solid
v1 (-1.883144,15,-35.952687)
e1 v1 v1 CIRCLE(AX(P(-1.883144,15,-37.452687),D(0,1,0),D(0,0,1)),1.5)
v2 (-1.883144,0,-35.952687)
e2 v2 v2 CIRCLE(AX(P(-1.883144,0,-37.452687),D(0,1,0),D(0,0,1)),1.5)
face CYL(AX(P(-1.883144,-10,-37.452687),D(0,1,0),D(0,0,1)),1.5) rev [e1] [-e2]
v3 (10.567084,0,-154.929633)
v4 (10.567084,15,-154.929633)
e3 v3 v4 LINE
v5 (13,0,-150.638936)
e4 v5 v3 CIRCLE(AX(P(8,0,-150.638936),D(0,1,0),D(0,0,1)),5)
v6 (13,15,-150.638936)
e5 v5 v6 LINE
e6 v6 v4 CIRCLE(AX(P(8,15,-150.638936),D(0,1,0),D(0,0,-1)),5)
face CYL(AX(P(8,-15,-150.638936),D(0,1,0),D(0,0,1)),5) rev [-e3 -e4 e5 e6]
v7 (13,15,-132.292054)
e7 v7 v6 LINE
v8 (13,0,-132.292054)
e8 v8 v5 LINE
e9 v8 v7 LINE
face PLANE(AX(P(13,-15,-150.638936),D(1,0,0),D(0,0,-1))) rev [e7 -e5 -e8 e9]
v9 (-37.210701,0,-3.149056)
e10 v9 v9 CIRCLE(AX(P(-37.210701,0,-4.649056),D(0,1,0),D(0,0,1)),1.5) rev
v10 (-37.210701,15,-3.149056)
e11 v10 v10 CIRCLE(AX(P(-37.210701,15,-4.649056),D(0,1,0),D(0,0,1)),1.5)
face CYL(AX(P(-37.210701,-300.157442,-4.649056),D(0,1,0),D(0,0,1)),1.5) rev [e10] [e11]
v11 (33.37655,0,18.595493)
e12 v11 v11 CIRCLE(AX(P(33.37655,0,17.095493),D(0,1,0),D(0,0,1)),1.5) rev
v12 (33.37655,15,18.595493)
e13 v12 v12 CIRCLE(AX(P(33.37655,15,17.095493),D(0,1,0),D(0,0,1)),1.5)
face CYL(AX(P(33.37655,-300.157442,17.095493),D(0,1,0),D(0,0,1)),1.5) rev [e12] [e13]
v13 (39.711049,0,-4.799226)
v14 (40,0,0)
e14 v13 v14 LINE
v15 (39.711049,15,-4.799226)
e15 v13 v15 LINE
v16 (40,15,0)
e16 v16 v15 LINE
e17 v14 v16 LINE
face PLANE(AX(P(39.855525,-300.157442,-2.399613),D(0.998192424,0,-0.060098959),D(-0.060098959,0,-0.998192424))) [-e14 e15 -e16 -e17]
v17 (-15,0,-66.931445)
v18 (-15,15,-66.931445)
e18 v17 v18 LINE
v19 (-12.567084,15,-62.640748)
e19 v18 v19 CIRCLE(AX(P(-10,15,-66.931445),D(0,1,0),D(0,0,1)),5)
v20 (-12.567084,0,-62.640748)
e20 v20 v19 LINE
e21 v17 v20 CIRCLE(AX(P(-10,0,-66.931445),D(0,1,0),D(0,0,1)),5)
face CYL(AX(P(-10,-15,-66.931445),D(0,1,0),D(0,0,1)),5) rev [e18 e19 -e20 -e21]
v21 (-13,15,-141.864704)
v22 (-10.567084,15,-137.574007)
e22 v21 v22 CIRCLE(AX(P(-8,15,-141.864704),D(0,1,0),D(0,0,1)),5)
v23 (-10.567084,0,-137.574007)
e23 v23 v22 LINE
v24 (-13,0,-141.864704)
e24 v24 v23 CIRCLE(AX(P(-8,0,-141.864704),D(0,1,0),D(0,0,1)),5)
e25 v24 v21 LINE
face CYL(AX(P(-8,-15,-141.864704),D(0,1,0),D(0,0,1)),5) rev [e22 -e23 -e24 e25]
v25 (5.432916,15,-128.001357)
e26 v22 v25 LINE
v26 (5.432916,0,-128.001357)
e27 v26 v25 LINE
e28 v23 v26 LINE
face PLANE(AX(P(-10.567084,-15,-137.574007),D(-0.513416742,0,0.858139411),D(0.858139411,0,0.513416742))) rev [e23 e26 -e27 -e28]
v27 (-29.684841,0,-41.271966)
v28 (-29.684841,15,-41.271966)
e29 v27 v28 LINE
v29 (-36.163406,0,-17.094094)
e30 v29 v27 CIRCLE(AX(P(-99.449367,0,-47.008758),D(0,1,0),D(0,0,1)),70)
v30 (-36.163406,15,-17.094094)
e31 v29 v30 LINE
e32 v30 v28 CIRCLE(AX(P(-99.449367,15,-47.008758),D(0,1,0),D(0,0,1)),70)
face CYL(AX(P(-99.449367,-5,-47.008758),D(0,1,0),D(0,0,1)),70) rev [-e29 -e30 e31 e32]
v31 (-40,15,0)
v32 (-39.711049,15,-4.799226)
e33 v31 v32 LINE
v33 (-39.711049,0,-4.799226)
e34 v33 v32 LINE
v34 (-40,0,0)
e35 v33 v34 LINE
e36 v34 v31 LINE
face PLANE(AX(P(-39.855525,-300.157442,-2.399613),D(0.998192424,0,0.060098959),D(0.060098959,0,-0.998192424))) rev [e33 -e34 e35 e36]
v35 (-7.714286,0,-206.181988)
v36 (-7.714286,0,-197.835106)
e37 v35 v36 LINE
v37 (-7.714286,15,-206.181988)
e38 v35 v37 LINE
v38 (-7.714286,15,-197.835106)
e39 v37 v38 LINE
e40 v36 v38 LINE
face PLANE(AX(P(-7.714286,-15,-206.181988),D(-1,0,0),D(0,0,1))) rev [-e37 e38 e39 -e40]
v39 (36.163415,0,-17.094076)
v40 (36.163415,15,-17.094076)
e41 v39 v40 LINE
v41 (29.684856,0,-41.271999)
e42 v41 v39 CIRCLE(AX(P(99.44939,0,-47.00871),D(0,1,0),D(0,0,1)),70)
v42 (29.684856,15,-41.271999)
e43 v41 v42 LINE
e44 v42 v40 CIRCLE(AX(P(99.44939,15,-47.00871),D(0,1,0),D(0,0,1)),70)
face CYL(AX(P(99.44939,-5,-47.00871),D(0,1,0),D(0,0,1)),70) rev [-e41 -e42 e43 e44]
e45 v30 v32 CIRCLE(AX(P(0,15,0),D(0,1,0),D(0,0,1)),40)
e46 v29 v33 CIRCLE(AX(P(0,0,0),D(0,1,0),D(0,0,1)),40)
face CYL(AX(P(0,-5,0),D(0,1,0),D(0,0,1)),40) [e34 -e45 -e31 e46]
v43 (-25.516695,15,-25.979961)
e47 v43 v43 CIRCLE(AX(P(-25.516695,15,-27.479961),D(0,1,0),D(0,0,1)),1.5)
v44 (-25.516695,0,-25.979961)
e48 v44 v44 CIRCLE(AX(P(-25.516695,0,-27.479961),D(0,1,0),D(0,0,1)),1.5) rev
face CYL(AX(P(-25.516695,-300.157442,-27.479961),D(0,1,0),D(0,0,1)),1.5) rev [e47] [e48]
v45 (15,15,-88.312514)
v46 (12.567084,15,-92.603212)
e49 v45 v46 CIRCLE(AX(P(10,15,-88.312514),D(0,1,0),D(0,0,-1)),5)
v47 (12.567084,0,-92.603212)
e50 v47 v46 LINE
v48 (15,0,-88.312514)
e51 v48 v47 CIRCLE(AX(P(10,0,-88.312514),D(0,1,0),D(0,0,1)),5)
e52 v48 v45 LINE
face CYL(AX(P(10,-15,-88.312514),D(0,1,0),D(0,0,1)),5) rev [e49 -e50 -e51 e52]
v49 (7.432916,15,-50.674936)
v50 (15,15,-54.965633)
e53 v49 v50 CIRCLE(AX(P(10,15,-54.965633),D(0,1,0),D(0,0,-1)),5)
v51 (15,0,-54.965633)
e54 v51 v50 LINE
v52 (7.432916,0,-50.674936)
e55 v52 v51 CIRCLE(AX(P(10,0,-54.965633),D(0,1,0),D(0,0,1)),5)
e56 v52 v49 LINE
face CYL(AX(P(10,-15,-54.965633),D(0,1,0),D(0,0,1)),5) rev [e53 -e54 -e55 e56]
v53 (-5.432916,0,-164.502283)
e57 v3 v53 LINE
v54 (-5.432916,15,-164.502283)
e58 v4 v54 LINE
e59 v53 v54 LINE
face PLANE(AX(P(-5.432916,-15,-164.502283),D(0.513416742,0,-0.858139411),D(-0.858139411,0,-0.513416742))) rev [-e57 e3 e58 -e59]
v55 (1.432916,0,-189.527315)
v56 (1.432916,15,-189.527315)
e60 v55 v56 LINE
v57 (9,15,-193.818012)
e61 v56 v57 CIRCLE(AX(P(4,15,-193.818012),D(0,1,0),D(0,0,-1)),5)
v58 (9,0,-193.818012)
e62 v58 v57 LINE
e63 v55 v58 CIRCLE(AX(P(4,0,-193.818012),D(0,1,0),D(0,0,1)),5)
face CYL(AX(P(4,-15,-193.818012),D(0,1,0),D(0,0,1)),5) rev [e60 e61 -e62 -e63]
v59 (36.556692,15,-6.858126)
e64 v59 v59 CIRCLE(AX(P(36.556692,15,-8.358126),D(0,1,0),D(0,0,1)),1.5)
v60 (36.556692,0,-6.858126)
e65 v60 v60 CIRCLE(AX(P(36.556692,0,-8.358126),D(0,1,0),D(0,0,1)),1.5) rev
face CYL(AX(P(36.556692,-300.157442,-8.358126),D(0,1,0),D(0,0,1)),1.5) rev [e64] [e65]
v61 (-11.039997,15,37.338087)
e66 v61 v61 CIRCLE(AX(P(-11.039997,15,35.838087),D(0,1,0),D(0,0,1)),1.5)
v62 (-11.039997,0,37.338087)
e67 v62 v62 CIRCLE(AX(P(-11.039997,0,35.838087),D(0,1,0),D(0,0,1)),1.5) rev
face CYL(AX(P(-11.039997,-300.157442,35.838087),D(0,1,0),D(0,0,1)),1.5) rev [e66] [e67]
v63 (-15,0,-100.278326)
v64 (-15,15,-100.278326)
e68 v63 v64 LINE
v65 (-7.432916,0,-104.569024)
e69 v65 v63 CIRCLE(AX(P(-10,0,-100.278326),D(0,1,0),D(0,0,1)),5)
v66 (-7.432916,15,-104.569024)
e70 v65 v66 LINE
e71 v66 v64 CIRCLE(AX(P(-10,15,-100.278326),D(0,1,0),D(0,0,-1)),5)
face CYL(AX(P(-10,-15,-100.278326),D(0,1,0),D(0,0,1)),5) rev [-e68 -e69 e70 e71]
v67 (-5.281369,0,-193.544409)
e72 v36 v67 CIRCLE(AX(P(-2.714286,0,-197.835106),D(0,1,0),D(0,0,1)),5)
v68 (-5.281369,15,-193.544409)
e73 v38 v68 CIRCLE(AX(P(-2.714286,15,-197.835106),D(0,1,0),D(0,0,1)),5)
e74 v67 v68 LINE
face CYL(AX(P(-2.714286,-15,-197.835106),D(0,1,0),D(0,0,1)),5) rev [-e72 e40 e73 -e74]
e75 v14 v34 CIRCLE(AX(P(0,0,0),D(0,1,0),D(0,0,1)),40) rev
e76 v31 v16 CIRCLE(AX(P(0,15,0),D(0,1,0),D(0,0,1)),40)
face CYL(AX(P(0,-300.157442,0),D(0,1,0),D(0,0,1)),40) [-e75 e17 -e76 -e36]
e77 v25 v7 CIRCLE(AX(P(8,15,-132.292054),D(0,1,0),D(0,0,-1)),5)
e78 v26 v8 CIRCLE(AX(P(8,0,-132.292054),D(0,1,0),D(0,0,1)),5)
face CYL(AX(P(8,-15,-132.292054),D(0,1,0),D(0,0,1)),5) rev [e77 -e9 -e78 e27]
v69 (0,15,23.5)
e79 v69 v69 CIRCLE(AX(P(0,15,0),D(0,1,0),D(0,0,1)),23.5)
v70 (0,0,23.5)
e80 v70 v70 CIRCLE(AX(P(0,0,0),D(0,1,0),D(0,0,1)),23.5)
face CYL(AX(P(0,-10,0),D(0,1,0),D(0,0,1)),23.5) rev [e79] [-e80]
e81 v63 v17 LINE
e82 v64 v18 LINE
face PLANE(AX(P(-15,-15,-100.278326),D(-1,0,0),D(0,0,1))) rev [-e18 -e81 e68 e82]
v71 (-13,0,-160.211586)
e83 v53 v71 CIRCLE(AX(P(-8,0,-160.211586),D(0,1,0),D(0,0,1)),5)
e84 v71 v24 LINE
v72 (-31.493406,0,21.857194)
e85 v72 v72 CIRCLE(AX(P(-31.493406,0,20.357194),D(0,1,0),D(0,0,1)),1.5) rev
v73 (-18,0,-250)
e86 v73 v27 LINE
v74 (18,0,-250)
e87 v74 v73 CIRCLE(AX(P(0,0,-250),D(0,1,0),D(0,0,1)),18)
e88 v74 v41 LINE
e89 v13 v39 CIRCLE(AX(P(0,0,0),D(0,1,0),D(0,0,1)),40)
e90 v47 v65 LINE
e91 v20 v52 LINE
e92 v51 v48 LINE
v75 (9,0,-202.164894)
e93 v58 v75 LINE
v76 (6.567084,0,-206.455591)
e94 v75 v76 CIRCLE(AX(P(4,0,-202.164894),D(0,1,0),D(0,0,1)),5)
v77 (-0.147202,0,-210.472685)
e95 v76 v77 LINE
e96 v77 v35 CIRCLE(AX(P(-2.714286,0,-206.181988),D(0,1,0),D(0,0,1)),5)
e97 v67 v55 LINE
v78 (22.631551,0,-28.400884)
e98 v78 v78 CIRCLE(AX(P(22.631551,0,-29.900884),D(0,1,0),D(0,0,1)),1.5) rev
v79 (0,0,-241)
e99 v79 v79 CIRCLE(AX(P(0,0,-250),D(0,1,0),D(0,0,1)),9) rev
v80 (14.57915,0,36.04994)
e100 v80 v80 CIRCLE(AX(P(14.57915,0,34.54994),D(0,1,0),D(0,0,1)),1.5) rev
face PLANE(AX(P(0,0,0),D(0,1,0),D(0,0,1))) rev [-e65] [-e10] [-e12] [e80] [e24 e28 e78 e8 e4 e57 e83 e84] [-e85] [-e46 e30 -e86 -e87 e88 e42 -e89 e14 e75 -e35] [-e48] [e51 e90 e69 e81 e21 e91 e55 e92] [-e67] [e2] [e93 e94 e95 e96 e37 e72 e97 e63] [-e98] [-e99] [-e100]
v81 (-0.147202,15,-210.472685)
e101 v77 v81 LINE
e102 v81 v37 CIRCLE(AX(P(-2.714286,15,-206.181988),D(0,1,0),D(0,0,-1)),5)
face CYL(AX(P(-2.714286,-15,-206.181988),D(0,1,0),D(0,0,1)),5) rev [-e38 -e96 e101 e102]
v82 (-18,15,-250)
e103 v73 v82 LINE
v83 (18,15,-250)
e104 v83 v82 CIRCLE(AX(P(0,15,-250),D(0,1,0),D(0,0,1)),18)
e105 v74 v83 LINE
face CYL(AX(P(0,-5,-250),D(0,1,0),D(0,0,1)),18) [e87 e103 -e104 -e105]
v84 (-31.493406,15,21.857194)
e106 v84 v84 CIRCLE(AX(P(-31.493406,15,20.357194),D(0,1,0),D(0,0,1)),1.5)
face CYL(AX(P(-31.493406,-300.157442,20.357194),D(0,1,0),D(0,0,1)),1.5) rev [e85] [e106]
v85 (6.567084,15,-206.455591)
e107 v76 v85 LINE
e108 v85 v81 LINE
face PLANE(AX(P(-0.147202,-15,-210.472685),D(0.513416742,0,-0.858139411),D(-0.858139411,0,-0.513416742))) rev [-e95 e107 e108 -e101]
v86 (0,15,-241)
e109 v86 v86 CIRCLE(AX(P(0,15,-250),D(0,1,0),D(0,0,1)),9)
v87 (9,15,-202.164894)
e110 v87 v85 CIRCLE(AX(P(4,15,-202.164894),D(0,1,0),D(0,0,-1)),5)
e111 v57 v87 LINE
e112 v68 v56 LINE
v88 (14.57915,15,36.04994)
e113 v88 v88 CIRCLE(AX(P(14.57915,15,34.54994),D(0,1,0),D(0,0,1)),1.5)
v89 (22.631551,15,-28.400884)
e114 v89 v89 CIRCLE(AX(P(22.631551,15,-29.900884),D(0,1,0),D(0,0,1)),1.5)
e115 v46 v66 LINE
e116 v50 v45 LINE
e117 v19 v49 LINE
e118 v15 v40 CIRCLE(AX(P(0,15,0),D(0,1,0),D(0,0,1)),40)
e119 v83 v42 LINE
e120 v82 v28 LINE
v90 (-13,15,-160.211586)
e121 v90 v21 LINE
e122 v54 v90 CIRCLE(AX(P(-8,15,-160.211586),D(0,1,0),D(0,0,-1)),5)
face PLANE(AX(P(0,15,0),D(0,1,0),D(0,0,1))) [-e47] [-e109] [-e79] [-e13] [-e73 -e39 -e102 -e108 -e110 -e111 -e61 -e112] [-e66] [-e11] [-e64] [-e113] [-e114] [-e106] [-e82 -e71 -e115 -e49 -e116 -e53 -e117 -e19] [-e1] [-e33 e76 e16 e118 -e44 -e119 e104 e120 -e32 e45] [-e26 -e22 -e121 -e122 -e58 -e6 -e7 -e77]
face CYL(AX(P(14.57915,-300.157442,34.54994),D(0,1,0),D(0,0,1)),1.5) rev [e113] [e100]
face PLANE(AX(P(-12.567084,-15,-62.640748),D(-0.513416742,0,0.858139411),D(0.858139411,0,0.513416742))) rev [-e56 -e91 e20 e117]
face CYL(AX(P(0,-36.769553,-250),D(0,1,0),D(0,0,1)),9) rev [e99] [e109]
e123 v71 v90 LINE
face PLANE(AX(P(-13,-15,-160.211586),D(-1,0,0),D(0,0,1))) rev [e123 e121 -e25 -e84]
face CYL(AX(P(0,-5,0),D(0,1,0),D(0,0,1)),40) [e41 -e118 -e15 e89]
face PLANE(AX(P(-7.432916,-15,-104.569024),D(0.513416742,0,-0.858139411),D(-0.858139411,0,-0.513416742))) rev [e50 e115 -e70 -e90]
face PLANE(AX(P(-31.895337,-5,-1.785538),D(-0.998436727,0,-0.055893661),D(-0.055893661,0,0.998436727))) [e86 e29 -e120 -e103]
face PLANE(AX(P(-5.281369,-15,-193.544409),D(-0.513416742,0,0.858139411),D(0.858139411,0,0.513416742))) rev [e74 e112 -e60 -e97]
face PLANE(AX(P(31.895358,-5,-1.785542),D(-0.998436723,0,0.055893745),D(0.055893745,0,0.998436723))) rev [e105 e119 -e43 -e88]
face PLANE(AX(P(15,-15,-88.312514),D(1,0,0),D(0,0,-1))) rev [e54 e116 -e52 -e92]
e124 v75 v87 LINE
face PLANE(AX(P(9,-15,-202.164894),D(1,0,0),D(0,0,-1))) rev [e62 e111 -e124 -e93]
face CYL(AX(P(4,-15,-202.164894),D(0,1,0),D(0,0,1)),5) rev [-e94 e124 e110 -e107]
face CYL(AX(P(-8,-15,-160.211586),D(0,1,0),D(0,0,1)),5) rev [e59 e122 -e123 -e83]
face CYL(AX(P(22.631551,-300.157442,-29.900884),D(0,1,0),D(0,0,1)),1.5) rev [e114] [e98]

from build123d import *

# Parameters (mm, degrees)
SKETCH_1_R          = 5.05
SKETCH_1_R_2        = 13
EXTRUDE_1_DEPTH     = 15
FILLET_1_R          = 3
SKETCH_7_R          = 2.05
CUT_EXTRUDE_4_DEPTH = 277.54113618
SKETCH_8_R          = 13
CUT_EXTRUDE_5_DEPTH = 277.54113618
SKETCH_9_R          = 25
SKETCH_9_R_2        = 13
EXTRUDE_4_DEPTH     = 15
SKETCH_10_R         = 1.5
EXTRUDE_5_DEPTH     = 15
EXTRUDE_START       = -15
SKETCH_14_R         = 13
SKETCH_14_R_2       = 9
EXTRUDE_6_DEPTH     = 15
SKETCH_13_R         = 23.5
SKETCH_13_R_2       = 1.5
CUT_EXTRUDE_6_DEPTH = 25
CUT_EXTRUDE_START   = -15
CUT_EXTRUDE_7_DEPTH = 15
EXTRUDE_9_DEPTH     = 15
CUT_EXTRUDE_8_DEPTH = 30


# Read off the part's stored shape, not the designer's step: 切除-拉伸7
with BuildPart() as part:
    # 草图1 → 凸台-拉伸1 (new body)
    with BuildSketch(Plane(origin=(0, 0, 0), x_dir=(1, 0, 0), z_dir=(0, 1, 0))):
        with BuildLine():
            Line((-17.992942616, -0.504), (-24.990198078, 249.3))
            ThreePointArc((-24.990198078, 249.3), (0, 275), (24.990198078, 249.3))
            Line((24.990198078, 249.3), (17.992942616, -0.504))
            ThreePointArc((17.992942616, -0.504), (0, -18), (-17.992942616, -0.504))
        make_face()
        with Locations(Location((0, 0, 0), (0, 0, 270))):
            Circle(SKETCH_1_R, mode=Mode.SUBTRACT)
        with Locations(Location((0, 250, 0), (0, 0, 270))):
            Circle(SKETCH_1_R_2, mode=Mode.SUBTRACT)
        Polygon((-16.444447487, 158.5), (-17.704941698, 203.5), (11.028871219, 137.174942267), align=None, mode=Mode.SUBTRACT)
        Polygon((15.954255294, 141), (18.475243716, 231), (-12, 219.5), align=None, mode=Mode.SUBTRACT)
    extrude(amount=EXTRUDE_1_DEPTH)

    # 圆角1
    fillet_1_edges = [part.edges().sort_by_distance(p)[0] for p in [
        (-16.444447487, 7.5, -158.5),
        (11.028871219, 7.5, -137.174942267),
        (-17.704941698, 7.5, -203.5),
        (18.475243716, 7.5, -231),
        (-12, 7.5, -219.5),
        (15.954255294, 7.5, -141),
    ]]
    fillet(fillet_1_edges, radius=FILLET_1_R)

    # 草图7 → 切除-拉伸4 (cut, through all)
    with BuildSketch(Plane(origin=(0, 15, 0), x_dir=(1, 0, 0), z_dir=(0, 1, 0))):
        with Locations(Location((15, 15, 0), (0, 0, 270))):
            Circle(SKETCH_7_R)
        with Locations(Location((-15, 15, 0), (0, 0, 270))):
            Circle(SKETCH_7_R)
        with Locations((-15, -15)):
            Circle(SKETCH_7_R)
        with Locations((15, -15)):
            Circle(SKETCH_7_R)
    extrude(amount=-CUT_EXTRUDE_4_DEPTH, mode=Mode.SUBTRACT)

    # 草图8 → 切除-拉伸5 (cut, through all)
    with BuildSketch(Plane(origin=(0, 15, 0), x_dir=(1, 0, 0), z_dir=(0, 1, 0))):
        with Locations(Location((0, 0, 0), (0, 0, 270))):
            Circle(SKETCH_8_R)
    extrude(amount=-CUT_EXTRUDE_5_DEPTH, mode=Mode.SUBTRACT)

    # 草图9 → 凸台-拉伸4 (add)
    with BuildSketch(Plane(origin=(0, 15, 0), x_dir=(1, 0, 0), z_dir=(0, 1, 0))):
        Circle(SKETCH_9_R)
        with Locations(Location((0, 0, 0), (0, 0, 270))):
            Circle(SKETCH_9_R_2, mode=Mode.SUBTRACT)
    extrude(amount=-EXTRUDE_4_DEPTH)

    # 草图10 → 凸台-拉伸5 (add)
    with BuildSketch(Plane(origin=(0, 15, 0), x_dir=(1, 0, 0), z_dir=(0, 1, 0))):
        with BuildLine():
            Line((-39.711049207, 4.799226071), (-40, 0))
            ThreePointArc((-40, 0), (0, -40), (40, 0))
            Line((40, 0), (39.711049207, 4.799226071))
            Line((39.711049207, 4.799226071), (24.990198078, 249.3))
            Line((24.990198078, 249.3), (18.993134598, 35.203136766))
            Line((18.993134598, 35.203136766), (18.478724461, 16.838549294))
            ThreePointArc((18.478724461, 16.838549294), (0, -25), (-18.478724461, 16.838549294))
            Line((-18.478724461, 16.838549294), (-18.993134598, 35.203136766))
            Line((-18.993134598, 35.203136766), (-24.990198078, 249.3))
            Line((-24.990198078, 249.3), (-39.711049207, 4.799226071))
        make_face()
        with Locations(Location((-31.493406412, -20.357194124, 0), (0, 0, 270))):
            Circle(SKETCH_10_R, mode=Mode.SUBTRACT)
        with Locations(Location((-37.210701127, 4.649055992, 0), (0, 0, 270))):
            Circle(SKETCH_10_R, mode=Mode.SUBTRACT)
        with Locations(Location((-25.516695234, 27.479961141, 0), (0, 0, 270))):
            Circle(SKETCH_10_R, mode=Mode.SUBTRACT)
        with Locations(Location((-11.039996826, -35.838086864, 0), (0, 0, 270))):
            Circle(SKETCH_10_R, mode=Mode.SUBTRACT)
        with Locations(Location((14.579149971, -34.549940465, 0), (0, 0, 270))):
            Circle(SKETCH_10_R, mode=Mode.SUBTRACT)
        with Locations(Location((33.376550467, -17.095492942, 0), (0, 0, 270))):
            Circle(SKETCH_10_R, mode=Mode.SUBTRACT)
        with Locations(Location((22.631551157, 29.900884473, 0), (0, 0, 270))):
            Circle(SKETCH_10_R, mode=Mode.SUBTRACT)
        with Locations(Location((36.55669206, 8.358125723, 0), (0, 0, 270))):
            Circle(SKETCH_10_R, mode=Mode.SUBTRACT)
    extrude(amount=-EXTRUDE_5_DEPTH)

    # 草图14 → 凸台-拉伸6 (add)
    with BuildSketch(Plane(origin=(0, 15, 0), x_dir=(1, 0, 0), z_dir=(0, 1, 0)).offset(EXTRUDE_START)):
        with Locations((0, 250)):
            Circle(SKETCH_14_R)
        with Locations(Location((0, 250, 0), (0, 0, 270))):
            Circle(SKETCH_14_R_2, mode=Mode.SUBTRACT)
    extrude(amount=EXTRUDE_6_DEPTH)

    # 草图13 → 切除-拉伸6 (cut)
    with BuildSketch(Plane(origin=(0, 15, 0), x_dir=(1, 0, 0), z_dir=(0, 1, 0))):
        with Locations(Location((0, 0, 0), (0, 0, 270))):
            Circle(SKETCH_13_R)
        with Locations(Location((-1.883144055, 37.452687066, 0), (0, 0, 270))):
            Circle(SKETCH_13_R_2)
    extrude(amount=-CUT_EXTRUDE_6_DEPTH, mode=Mode.SUBTRACT)

    # 切除-拉伸7 outline → 切除-拉伸7 (cut)
    with BuildSketch(Plane(origin=(0, 15, 0), x_dir=(1, 0, 0), z_dir=(0, 1, 0)).offset(CUT_EXTRUDE_START)):
        with BuildLine():
            ThreePointArc((-39.711049207, 4.799226071), (-38.432072473, 11.089445679), (-36.163406358, 17.094093734))
            ThreePointArc((-36.163406358, 17.094093734), (-31.834646693, 28.891099747), (-29.684840552, 41.271965817))
            Line((-29.684840552, 41.271965817), (-18, 250))
            ThreePointArc((-18, 250), (0, 268), (18, 250))
            Line((18, 250), (29.684856444, 41.271998774))
            ThreePointArc((29.684856444, 41.271998774), (31.834654407, 28.891107358), (36.163414547, 17.09407641))
            ThreePointArc((36.163414547, 17.09407641), (38.432075129, 11.089436474), (39.711049207, 4.799226071))
            Line((39.711049207, 4.799226071), (24.990198078, 249.3))
            ThreePointArc((24.990198078, 249.3), (0, 275), (-24.990198078, 249.3))
            Line((-24.990198078, 249.3), (-39.711049207, 4.799226071))
        make_face()
    extrude(amount=CUT_EXTRUDE_7_DEPTH, mode=Mode.SUBTRACT)

    # 草图18 → 凸台-拉伸9 (add)
    with BuildSketch(Plane(origin=(0, 0, 0), x_dir=(-1, 0, 0), z_dir=(0, -1, 0))):
        Polygon((-20.868155543, 131.844626328), (20.706902291, 152.097209515), (16.905995412, 230.591726078), (-18.51031166, 232.603381148), (-19.336560971, 196.02914685), align=None)
    extrude(amount=-EXTRUDE_9_DEPTH)

    # 草图19 → 切除-拉伸8 (cut)
    with BuildSketch(Plane(origin=(0, 15, 0), x_dir=(1, 0, 0), z_dir=(0, 1, 0))):
        with BuildLine():
            Line((-7.714285714, 206.181987904), (-7.714285714, 197.835106113))
            ThreePointArc((-7.714285714, 197.835106113), (-7.063735021, 195.368876049), (-5.281369423, 193.544409057))
            Line((-5.281369423, 193.544409057), (1.432916291, 189.52731504))
            ThreePointArc((1.432916291, 189.52731504), (6.466230064, 189.468562789), (9, 193.818012096))
            Line((9, 193.818012096), (9, 202.164893887))
            ThreePointArc((9, 202.164893887), (8.349449307, 204.631123951), (6.567083709, 206.455590943))
            Line((6.567083709, 206.455590943), (-0.147202005, 210.47268496))
            ThreePointArc((-0.147202005, 210.47268496), (-5.180515778, 210.531437211), (-7.714285714, 206.181987904))
        make_face()
        with BuildLine():
            Line((-13, 160.211585543), (-13, 141.864703752))
            ThreePointArc((-13, 141.864703752), (-12.349449307, 139.398473689), (-10.567083709, 137.574006696))
            Line((-10.567083709, 137.574006696), (5.432916291, 128.001357123))
            ThreePointArc((5.432916291, 128.001357123), (10.466230064, 127.942604873), (13, 132.29205418))
            Line((13, 132.29205418), (13, 150.63893597))
            ThreePointArc((13, 150.63893597), (12.349449307, 153.105166034), (10.567083709, 154.929633027))
            Line((10.567083709, 154.929633027), (-5.432916291, 164.5022826))
            ThreePointArc((-5.432916291, 164.5022826), (-10.466230064, 164.56103485), (-13, 160.211585543))
        make_face()
        with BuildLine():
            Line((-15, 100.278326449), (-15, 66.931444658))
            ThreePointArc((-15, 66.931444658), (-14.349449307, 64.465214594), (-12.567083709, 62.640747602))
            Line((-12.567083709, 62.640747602), (7.432916291, 50.674935636))
            ThreePointArc((7.432916291, 50.674935636), (12.466230064, 50.616183385), (15, 54.965632692))
            Line((15, 54.965632692), (15, 88.312514483))
            ThreePointArc((15, 88.312514483), (14.349449307, 90.778744547), (12.567083709, 92.60321154))
            Line((12.567083709, 92.60321154), (-7.432916291, 104.569023505))
            ThreePointArc((-7.432916291, 104.569023505), (-12.466230064, 104.627775756), (-15, 100.278326449))
        make_face()
    extrude(amount=-CUT_EXTRUDE_8_DEPTH, mode=Mode.SUBTRACT)


solid = part.part
